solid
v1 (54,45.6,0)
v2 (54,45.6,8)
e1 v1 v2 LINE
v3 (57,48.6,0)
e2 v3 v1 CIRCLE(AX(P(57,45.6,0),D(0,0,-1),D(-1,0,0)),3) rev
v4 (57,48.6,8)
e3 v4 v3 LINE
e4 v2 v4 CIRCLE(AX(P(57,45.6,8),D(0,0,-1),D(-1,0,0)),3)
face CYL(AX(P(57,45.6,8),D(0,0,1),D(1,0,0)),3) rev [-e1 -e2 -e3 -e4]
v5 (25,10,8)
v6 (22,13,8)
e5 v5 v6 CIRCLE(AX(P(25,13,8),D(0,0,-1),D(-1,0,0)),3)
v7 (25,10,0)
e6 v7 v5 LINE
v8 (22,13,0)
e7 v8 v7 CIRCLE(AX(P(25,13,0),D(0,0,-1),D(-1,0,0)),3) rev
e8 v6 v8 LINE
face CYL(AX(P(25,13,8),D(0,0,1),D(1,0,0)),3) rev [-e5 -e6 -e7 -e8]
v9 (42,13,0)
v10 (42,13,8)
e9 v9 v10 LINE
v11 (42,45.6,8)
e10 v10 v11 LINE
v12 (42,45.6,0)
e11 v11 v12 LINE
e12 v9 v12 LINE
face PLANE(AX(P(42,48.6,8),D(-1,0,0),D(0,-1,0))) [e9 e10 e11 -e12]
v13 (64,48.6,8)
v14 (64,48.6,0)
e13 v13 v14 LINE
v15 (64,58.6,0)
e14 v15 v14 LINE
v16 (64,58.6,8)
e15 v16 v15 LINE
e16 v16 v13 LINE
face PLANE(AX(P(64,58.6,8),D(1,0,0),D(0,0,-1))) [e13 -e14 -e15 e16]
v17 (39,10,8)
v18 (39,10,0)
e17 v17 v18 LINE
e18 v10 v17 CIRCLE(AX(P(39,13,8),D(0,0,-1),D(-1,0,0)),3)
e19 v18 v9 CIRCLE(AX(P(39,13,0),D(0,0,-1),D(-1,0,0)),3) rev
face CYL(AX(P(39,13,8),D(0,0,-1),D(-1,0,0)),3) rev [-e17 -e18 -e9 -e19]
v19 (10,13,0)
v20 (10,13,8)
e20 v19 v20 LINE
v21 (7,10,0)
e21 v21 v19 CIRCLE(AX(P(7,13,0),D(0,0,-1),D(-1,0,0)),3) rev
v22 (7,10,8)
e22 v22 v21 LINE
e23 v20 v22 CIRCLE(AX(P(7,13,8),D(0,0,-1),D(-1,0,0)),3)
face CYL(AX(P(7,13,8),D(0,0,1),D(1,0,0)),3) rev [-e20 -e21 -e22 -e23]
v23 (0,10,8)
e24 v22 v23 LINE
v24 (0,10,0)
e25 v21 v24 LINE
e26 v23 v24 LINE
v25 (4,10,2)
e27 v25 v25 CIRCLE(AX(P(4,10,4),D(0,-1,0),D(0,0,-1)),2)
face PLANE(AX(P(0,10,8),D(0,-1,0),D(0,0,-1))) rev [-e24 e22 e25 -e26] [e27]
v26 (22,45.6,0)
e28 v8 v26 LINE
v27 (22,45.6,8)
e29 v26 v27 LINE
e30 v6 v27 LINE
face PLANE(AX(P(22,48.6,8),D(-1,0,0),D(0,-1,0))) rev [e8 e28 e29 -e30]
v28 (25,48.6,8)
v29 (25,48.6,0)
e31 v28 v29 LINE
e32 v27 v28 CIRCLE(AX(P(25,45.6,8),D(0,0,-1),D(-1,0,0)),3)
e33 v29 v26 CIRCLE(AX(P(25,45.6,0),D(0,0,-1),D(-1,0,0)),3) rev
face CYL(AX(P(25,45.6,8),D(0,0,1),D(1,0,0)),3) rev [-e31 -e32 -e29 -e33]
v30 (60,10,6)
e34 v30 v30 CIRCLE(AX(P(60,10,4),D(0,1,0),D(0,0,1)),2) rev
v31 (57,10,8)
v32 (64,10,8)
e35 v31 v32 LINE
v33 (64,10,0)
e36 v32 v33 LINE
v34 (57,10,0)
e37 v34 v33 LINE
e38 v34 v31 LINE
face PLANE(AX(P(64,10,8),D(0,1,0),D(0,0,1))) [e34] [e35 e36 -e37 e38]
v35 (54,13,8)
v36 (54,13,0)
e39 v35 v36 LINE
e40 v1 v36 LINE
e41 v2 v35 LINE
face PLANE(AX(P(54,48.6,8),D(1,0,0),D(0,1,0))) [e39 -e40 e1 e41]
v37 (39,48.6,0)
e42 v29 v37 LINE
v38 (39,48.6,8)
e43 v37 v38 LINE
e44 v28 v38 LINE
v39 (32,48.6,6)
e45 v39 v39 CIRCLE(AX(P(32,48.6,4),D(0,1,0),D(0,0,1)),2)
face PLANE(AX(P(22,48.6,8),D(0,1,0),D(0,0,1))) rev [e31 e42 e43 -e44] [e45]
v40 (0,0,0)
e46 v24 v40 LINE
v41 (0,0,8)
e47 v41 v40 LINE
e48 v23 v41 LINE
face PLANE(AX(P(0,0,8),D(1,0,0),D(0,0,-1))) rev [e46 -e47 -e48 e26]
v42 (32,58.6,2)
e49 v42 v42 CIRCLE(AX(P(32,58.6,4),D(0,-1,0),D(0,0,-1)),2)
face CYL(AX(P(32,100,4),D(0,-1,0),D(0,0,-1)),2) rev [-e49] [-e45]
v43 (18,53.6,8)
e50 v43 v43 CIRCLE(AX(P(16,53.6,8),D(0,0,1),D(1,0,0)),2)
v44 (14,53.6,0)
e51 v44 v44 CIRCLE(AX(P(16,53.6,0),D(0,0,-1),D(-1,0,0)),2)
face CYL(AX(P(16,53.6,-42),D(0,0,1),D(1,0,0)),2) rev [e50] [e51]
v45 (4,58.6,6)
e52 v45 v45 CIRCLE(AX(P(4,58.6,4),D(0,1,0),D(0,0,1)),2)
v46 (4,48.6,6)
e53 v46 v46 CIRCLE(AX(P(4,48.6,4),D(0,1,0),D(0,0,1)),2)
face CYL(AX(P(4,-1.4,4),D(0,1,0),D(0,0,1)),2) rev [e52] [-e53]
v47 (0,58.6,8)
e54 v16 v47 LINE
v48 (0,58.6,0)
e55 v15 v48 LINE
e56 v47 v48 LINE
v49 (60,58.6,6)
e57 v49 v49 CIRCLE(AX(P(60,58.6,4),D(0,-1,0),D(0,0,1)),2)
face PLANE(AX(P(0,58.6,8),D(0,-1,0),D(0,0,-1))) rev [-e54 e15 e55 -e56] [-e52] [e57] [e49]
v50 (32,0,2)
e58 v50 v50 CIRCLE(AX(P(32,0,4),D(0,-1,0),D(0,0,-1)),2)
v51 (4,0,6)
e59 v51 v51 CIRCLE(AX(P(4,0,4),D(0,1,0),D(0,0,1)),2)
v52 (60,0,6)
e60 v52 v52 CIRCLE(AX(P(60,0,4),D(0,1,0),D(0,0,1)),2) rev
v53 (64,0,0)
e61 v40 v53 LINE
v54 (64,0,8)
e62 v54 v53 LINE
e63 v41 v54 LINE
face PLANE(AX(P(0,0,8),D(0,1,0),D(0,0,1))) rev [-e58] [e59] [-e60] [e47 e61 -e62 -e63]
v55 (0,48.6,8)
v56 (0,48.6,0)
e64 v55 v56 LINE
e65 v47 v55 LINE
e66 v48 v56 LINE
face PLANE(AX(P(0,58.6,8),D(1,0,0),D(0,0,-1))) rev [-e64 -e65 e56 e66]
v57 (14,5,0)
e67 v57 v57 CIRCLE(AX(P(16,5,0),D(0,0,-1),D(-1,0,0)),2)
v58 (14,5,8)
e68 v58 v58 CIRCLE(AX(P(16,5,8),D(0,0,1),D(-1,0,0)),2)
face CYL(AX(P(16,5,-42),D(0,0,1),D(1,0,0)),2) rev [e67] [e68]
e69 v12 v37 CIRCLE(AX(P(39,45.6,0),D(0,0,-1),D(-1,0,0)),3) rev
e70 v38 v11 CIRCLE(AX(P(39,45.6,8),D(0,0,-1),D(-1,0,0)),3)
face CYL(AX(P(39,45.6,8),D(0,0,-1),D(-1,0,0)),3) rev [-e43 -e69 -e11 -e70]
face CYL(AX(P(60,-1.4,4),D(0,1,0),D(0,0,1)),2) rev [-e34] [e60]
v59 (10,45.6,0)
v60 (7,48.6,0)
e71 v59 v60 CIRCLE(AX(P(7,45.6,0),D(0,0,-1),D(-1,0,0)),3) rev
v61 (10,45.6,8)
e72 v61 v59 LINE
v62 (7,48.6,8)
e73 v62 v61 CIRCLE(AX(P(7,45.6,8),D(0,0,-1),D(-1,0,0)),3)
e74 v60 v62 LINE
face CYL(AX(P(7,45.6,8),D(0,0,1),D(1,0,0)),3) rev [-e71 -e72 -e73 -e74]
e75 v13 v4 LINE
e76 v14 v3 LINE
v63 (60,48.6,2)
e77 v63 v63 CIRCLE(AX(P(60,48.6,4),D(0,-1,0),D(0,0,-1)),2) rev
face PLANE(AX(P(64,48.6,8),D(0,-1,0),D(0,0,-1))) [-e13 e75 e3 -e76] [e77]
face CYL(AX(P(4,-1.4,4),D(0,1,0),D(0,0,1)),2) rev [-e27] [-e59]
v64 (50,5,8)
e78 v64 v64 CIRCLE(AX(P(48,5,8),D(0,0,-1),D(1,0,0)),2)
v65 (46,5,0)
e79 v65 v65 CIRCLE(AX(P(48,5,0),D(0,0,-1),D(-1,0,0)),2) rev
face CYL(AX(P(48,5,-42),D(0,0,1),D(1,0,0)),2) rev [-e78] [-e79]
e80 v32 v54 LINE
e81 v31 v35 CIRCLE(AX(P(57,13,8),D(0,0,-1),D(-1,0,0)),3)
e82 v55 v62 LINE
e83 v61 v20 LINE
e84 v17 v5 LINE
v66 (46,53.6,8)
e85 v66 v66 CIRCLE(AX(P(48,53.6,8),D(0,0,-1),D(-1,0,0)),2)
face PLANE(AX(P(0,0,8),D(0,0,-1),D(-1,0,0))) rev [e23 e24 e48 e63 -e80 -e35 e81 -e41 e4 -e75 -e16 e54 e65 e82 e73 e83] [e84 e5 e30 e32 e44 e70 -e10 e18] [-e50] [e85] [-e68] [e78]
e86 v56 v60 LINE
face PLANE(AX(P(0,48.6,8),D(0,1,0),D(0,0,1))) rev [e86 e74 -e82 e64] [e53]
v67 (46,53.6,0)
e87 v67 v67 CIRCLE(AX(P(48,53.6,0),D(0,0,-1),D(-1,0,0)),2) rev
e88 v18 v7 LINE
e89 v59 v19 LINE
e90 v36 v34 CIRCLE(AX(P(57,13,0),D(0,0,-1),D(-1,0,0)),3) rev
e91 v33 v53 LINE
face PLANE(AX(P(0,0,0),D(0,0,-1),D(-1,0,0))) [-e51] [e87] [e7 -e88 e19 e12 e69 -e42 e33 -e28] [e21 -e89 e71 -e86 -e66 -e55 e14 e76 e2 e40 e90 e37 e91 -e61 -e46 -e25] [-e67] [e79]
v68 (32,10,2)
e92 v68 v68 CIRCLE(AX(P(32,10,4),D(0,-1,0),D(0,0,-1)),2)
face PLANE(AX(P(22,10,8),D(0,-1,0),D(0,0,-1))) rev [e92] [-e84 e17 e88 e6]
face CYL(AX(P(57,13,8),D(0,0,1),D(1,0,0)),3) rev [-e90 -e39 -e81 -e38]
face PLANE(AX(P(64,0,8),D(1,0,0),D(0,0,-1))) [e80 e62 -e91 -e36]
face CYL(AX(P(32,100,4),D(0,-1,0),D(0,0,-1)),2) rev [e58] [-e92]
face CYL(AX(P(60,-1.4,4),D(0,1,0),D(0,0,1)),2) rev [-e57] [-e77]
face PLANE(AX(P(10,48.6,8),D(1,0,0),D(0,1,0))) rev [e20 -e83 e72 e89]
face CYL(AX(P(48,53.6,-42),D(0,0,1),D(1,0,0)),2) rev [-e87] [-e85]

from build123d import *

# Parameters (mm, degrees)
EXTRUDE_1_DEPTH      = 8
FILLET_1_R           = 3
SKETCH_3_R           = 2
CUT_EXTRUDE_1_DEPTH  = 60
SKETCH_4_R           = 2
CUT_EXTRUDE_2_DEPTH  = 50
MIRROR_1_OUTLINE_R   = 2
MIRROR_1_DEPTH       = 1.9999999
MIRROR_START         = 6.0000001
MIRROR_1_2_OUTLINE_R = 2
MIRROR_1_2_DEPTH     = 1.9999999
MIRROR_START_2       = 1.9999999
MIRROR_1_3_OUTLINE_R = 2
MIRROR_1_3_DEPTH     = 4.0000002
MIRROR_START_3       = -1
MIRROR_1_4_OUTLINE_R = 2
MIRROR_1_4_DEPTH     = 61
SKETCH_5_R           = 2
CUT_EXTRUDE_3_DEPTH  = 100


with BuildPart() as part:
    # 草图1 → 凸台-拉伸1 (new body)
    with BuildSketch(Plane.XY):
        Polygon((0, 0), (32, 0), (32, 10), (22, 10), (22, 48.6), (32, 48.6), (32, 58.6), (0, 58.6), (0, 48.6), (10, 48.6), (10, 10), (0, 10), align=None)
    extrude(amount=EXTRUDE_1_DEPTH)

    # 圆角1
    fillet_1_edges = [part.edges().sort_by_distance(p)[0] for p in [
        (10, 10, 4),
        (10, 48.6, 4),
        (22, 48.6, 4),
        (22, 10, 4),
    ]]
    fillet(fillet_1_edges, radius=FILLET_1_R)

    # 草图3 → 切除-拉伸1 (cut)
    with BuildSketch(Plane(origin=(0, 58.6, 0), x_dir=(1, 0, 0), z_dir=(0, 1, 0))):
        with Locations(Location((4, -4, 0), (0, 0, 270))):
            Circle(SKETCH_3_R)
    extrude(amount=-CUT_EXTRUDE_1_DEPTH, mode=Mode.SUBTRACT)

    # 草图4 → 切除-拉伸2 (cut)
    with BuildSketch(Plane.XY.offset(8)):
        with Locations((16, 53.6)):
            Circle(SKETCH_4_R)
        with Locations(Location((16, 5, 0), (0, 0, 180))):
            Circle(SKETCH_4_R)
    extrude(amount=-CUT_EXTRUDE_2_DEPTH, mode=Mode.SUBTRACT)

    # 镜向1: read off the stored shape, not the designer's step
    # 镜向1 outline → 镜向1 (add)
    with BuildSketch(Plane.XY):
        with BuildLine():
            Line((32, 0), (64, 0))
            Line((64, 0), (64, 10))
            Line((64, 10), (57, 10))
            ThreePointArc((57, 10), (54.878679656, 10.878679656), (54, 13))
            Line((54, 13), (54, 45.6))
            ThreePointArc((54, 45.6), (54.878679656, 47.721320344), (57, 48.6))
            Line((57, 48.6), (64, 48.6))
            Line((64, 48.6), (64, 58.6))
            Line((64, 58.6), (32, 58.6))
            Line((32, 58.6), (32, 48.6))
            Line((32, 48.6), (39, 48.6))
            ThreePointArc((39, 48.6), (41.121320344, 47.721320344), (42, 45.6))
            Line((42, 45.6), (42, 13))
            ThreePointArc((42, 13), (41.121320344, 10.878679656), (39, 10))
            Line((39, 10), (32, 10))
            Line((32, 10), (32, 0))
        make_face()
        with Locations((48, 5)):
            Circle(MIRROR_1_OUTLINE_R, mode=Mode.SUBTRACT)
        with Locations((48, 53.6)):
            Circle(MIRROR_1_OUTLINE_R, mode=Mode.SUBTRACT)
    extrude(amount=MIRROR_1_DEPTH)

    # Mirror 1 2 outline → Mirror 1 2 (add)
    with BuildSketch(Plane.XY.offset(MIRROR_START)):
        with BuildLine():
            Line((32, 0), (64, 0))
            Line((64, 0), (64, 10))
            Line((64, 10), (57, 10))
            ThreePointArc((57, 10), (54.878679656, 10.878679656), (54, 13))
            Line((54, 13), (54, 45.6))
            ThreePointArc((54, 45.6), (54.878679656, 47.721320344), (57, 48.6))
            Line((57, 48.6), (64, 48.6))
            Line((64, 48.6), (64, 58.6))
            Line((64, 58.6), (32, 58.6))
            Line((32, 58.6), (32, 48.6))
            Line((32, 48.6), (39, 48.6))
            ThreePointArc((39, 48.6), (41.121320344, 47.721320344), (42, 45.6))
            Line((42, 45.6), (42, 13))
            ThreePointArc((42, 13), (41.121320344, 10.878679656), (39, 10))
            Line((39, 10), (32, 10))
            Line((32, 10), (32, 0))
        make_face()
        with Locations((48, 5)):
            Circle(MIRROR_1_2_OUTLINE_R, mode=Mode.SUBTRACT)
        with Locations((48, 53.6)):
            Circle(MIRROR_1_2_OUTLINE_R, mode=Mode.SUBTRACT)
    extrude(amount=MIRROR_1_2_DEPTH)

    # Mirror 1 3 outline → Mirror 1 3 (add)
    with BuildSketch(Plane.XY.offset(MIRROR_START_2)):
        with BuildLine():
            Line((32, 0), (64, 0))
            Line((64, 0), (64, 10))
            Line((64, 10), (57, 10))
            ThreePointArc((57, 10), (54.878679656, 10.878679656), (54, 13))
            Line((54, 13), (54, 45.6))
            ThreePointArc((54, 45.6), (54.878679656, 47.721320344), (57, 48.6))
            Line((57, 48.6), (64, 48.6))
            Line((64, 48.6), (64, 58.6))
            Line((64, 58.6), (32, 58.6))
            Line((32, 58.6), (32, 48.6))
            Line((32, 48.6), (39, 48.6))
            ThreePointArc((39, 48.6), (41.121320344, 47.721320344), (42, 45.6))
            Line((42, 45.6), (42, 13))
            ThreePointArc((42, 13), (41.121320344, 10.878679656), (39, 10))
            Line((39, 10), (32, 10))
            Line((32, 10), (32, 0))
        make_face()
        with Locations((48, 5)):
            Circle(MIRROR_1_3_OUTLINE_R, mode=Mode.SUBTRACT)
        with Locations((48, 53.6)):
            Circle(MIRROR_1_3_OUTLINE_R, mode=Mode.SUBTRACT)
    extrude(amount=MIRROR_1_3_DEPTH)

    # Mirror 1 4 outline → Mirror 1 4 (cut)
    with BuildSketch(Plane(origin=(0, 0, 0), x_dir=(1, 0, 0), z_dir=(0, 1, 0)).offset(MIRROR_START_3)):
        with Locations((60, -4)):
            Circle(MIRROR_1_4_OUTLINE_R)
    extrude(amount=MIRROR_1_4_DEPTH, mode=Mode.SUBTRACT)

    # 草图5 → 切除-拉伸3 (cut)
    with BuildSketch(Plane.XZ):
        with Locations(Location((32, 4, 0), (0, 0, 270))):
            Circle(SKETCH_5_R)
    extrude(amount=-CUT_EXTRUDE_3_DEPTH, mode=Mode.SUBTRACT)


solid = part.part
